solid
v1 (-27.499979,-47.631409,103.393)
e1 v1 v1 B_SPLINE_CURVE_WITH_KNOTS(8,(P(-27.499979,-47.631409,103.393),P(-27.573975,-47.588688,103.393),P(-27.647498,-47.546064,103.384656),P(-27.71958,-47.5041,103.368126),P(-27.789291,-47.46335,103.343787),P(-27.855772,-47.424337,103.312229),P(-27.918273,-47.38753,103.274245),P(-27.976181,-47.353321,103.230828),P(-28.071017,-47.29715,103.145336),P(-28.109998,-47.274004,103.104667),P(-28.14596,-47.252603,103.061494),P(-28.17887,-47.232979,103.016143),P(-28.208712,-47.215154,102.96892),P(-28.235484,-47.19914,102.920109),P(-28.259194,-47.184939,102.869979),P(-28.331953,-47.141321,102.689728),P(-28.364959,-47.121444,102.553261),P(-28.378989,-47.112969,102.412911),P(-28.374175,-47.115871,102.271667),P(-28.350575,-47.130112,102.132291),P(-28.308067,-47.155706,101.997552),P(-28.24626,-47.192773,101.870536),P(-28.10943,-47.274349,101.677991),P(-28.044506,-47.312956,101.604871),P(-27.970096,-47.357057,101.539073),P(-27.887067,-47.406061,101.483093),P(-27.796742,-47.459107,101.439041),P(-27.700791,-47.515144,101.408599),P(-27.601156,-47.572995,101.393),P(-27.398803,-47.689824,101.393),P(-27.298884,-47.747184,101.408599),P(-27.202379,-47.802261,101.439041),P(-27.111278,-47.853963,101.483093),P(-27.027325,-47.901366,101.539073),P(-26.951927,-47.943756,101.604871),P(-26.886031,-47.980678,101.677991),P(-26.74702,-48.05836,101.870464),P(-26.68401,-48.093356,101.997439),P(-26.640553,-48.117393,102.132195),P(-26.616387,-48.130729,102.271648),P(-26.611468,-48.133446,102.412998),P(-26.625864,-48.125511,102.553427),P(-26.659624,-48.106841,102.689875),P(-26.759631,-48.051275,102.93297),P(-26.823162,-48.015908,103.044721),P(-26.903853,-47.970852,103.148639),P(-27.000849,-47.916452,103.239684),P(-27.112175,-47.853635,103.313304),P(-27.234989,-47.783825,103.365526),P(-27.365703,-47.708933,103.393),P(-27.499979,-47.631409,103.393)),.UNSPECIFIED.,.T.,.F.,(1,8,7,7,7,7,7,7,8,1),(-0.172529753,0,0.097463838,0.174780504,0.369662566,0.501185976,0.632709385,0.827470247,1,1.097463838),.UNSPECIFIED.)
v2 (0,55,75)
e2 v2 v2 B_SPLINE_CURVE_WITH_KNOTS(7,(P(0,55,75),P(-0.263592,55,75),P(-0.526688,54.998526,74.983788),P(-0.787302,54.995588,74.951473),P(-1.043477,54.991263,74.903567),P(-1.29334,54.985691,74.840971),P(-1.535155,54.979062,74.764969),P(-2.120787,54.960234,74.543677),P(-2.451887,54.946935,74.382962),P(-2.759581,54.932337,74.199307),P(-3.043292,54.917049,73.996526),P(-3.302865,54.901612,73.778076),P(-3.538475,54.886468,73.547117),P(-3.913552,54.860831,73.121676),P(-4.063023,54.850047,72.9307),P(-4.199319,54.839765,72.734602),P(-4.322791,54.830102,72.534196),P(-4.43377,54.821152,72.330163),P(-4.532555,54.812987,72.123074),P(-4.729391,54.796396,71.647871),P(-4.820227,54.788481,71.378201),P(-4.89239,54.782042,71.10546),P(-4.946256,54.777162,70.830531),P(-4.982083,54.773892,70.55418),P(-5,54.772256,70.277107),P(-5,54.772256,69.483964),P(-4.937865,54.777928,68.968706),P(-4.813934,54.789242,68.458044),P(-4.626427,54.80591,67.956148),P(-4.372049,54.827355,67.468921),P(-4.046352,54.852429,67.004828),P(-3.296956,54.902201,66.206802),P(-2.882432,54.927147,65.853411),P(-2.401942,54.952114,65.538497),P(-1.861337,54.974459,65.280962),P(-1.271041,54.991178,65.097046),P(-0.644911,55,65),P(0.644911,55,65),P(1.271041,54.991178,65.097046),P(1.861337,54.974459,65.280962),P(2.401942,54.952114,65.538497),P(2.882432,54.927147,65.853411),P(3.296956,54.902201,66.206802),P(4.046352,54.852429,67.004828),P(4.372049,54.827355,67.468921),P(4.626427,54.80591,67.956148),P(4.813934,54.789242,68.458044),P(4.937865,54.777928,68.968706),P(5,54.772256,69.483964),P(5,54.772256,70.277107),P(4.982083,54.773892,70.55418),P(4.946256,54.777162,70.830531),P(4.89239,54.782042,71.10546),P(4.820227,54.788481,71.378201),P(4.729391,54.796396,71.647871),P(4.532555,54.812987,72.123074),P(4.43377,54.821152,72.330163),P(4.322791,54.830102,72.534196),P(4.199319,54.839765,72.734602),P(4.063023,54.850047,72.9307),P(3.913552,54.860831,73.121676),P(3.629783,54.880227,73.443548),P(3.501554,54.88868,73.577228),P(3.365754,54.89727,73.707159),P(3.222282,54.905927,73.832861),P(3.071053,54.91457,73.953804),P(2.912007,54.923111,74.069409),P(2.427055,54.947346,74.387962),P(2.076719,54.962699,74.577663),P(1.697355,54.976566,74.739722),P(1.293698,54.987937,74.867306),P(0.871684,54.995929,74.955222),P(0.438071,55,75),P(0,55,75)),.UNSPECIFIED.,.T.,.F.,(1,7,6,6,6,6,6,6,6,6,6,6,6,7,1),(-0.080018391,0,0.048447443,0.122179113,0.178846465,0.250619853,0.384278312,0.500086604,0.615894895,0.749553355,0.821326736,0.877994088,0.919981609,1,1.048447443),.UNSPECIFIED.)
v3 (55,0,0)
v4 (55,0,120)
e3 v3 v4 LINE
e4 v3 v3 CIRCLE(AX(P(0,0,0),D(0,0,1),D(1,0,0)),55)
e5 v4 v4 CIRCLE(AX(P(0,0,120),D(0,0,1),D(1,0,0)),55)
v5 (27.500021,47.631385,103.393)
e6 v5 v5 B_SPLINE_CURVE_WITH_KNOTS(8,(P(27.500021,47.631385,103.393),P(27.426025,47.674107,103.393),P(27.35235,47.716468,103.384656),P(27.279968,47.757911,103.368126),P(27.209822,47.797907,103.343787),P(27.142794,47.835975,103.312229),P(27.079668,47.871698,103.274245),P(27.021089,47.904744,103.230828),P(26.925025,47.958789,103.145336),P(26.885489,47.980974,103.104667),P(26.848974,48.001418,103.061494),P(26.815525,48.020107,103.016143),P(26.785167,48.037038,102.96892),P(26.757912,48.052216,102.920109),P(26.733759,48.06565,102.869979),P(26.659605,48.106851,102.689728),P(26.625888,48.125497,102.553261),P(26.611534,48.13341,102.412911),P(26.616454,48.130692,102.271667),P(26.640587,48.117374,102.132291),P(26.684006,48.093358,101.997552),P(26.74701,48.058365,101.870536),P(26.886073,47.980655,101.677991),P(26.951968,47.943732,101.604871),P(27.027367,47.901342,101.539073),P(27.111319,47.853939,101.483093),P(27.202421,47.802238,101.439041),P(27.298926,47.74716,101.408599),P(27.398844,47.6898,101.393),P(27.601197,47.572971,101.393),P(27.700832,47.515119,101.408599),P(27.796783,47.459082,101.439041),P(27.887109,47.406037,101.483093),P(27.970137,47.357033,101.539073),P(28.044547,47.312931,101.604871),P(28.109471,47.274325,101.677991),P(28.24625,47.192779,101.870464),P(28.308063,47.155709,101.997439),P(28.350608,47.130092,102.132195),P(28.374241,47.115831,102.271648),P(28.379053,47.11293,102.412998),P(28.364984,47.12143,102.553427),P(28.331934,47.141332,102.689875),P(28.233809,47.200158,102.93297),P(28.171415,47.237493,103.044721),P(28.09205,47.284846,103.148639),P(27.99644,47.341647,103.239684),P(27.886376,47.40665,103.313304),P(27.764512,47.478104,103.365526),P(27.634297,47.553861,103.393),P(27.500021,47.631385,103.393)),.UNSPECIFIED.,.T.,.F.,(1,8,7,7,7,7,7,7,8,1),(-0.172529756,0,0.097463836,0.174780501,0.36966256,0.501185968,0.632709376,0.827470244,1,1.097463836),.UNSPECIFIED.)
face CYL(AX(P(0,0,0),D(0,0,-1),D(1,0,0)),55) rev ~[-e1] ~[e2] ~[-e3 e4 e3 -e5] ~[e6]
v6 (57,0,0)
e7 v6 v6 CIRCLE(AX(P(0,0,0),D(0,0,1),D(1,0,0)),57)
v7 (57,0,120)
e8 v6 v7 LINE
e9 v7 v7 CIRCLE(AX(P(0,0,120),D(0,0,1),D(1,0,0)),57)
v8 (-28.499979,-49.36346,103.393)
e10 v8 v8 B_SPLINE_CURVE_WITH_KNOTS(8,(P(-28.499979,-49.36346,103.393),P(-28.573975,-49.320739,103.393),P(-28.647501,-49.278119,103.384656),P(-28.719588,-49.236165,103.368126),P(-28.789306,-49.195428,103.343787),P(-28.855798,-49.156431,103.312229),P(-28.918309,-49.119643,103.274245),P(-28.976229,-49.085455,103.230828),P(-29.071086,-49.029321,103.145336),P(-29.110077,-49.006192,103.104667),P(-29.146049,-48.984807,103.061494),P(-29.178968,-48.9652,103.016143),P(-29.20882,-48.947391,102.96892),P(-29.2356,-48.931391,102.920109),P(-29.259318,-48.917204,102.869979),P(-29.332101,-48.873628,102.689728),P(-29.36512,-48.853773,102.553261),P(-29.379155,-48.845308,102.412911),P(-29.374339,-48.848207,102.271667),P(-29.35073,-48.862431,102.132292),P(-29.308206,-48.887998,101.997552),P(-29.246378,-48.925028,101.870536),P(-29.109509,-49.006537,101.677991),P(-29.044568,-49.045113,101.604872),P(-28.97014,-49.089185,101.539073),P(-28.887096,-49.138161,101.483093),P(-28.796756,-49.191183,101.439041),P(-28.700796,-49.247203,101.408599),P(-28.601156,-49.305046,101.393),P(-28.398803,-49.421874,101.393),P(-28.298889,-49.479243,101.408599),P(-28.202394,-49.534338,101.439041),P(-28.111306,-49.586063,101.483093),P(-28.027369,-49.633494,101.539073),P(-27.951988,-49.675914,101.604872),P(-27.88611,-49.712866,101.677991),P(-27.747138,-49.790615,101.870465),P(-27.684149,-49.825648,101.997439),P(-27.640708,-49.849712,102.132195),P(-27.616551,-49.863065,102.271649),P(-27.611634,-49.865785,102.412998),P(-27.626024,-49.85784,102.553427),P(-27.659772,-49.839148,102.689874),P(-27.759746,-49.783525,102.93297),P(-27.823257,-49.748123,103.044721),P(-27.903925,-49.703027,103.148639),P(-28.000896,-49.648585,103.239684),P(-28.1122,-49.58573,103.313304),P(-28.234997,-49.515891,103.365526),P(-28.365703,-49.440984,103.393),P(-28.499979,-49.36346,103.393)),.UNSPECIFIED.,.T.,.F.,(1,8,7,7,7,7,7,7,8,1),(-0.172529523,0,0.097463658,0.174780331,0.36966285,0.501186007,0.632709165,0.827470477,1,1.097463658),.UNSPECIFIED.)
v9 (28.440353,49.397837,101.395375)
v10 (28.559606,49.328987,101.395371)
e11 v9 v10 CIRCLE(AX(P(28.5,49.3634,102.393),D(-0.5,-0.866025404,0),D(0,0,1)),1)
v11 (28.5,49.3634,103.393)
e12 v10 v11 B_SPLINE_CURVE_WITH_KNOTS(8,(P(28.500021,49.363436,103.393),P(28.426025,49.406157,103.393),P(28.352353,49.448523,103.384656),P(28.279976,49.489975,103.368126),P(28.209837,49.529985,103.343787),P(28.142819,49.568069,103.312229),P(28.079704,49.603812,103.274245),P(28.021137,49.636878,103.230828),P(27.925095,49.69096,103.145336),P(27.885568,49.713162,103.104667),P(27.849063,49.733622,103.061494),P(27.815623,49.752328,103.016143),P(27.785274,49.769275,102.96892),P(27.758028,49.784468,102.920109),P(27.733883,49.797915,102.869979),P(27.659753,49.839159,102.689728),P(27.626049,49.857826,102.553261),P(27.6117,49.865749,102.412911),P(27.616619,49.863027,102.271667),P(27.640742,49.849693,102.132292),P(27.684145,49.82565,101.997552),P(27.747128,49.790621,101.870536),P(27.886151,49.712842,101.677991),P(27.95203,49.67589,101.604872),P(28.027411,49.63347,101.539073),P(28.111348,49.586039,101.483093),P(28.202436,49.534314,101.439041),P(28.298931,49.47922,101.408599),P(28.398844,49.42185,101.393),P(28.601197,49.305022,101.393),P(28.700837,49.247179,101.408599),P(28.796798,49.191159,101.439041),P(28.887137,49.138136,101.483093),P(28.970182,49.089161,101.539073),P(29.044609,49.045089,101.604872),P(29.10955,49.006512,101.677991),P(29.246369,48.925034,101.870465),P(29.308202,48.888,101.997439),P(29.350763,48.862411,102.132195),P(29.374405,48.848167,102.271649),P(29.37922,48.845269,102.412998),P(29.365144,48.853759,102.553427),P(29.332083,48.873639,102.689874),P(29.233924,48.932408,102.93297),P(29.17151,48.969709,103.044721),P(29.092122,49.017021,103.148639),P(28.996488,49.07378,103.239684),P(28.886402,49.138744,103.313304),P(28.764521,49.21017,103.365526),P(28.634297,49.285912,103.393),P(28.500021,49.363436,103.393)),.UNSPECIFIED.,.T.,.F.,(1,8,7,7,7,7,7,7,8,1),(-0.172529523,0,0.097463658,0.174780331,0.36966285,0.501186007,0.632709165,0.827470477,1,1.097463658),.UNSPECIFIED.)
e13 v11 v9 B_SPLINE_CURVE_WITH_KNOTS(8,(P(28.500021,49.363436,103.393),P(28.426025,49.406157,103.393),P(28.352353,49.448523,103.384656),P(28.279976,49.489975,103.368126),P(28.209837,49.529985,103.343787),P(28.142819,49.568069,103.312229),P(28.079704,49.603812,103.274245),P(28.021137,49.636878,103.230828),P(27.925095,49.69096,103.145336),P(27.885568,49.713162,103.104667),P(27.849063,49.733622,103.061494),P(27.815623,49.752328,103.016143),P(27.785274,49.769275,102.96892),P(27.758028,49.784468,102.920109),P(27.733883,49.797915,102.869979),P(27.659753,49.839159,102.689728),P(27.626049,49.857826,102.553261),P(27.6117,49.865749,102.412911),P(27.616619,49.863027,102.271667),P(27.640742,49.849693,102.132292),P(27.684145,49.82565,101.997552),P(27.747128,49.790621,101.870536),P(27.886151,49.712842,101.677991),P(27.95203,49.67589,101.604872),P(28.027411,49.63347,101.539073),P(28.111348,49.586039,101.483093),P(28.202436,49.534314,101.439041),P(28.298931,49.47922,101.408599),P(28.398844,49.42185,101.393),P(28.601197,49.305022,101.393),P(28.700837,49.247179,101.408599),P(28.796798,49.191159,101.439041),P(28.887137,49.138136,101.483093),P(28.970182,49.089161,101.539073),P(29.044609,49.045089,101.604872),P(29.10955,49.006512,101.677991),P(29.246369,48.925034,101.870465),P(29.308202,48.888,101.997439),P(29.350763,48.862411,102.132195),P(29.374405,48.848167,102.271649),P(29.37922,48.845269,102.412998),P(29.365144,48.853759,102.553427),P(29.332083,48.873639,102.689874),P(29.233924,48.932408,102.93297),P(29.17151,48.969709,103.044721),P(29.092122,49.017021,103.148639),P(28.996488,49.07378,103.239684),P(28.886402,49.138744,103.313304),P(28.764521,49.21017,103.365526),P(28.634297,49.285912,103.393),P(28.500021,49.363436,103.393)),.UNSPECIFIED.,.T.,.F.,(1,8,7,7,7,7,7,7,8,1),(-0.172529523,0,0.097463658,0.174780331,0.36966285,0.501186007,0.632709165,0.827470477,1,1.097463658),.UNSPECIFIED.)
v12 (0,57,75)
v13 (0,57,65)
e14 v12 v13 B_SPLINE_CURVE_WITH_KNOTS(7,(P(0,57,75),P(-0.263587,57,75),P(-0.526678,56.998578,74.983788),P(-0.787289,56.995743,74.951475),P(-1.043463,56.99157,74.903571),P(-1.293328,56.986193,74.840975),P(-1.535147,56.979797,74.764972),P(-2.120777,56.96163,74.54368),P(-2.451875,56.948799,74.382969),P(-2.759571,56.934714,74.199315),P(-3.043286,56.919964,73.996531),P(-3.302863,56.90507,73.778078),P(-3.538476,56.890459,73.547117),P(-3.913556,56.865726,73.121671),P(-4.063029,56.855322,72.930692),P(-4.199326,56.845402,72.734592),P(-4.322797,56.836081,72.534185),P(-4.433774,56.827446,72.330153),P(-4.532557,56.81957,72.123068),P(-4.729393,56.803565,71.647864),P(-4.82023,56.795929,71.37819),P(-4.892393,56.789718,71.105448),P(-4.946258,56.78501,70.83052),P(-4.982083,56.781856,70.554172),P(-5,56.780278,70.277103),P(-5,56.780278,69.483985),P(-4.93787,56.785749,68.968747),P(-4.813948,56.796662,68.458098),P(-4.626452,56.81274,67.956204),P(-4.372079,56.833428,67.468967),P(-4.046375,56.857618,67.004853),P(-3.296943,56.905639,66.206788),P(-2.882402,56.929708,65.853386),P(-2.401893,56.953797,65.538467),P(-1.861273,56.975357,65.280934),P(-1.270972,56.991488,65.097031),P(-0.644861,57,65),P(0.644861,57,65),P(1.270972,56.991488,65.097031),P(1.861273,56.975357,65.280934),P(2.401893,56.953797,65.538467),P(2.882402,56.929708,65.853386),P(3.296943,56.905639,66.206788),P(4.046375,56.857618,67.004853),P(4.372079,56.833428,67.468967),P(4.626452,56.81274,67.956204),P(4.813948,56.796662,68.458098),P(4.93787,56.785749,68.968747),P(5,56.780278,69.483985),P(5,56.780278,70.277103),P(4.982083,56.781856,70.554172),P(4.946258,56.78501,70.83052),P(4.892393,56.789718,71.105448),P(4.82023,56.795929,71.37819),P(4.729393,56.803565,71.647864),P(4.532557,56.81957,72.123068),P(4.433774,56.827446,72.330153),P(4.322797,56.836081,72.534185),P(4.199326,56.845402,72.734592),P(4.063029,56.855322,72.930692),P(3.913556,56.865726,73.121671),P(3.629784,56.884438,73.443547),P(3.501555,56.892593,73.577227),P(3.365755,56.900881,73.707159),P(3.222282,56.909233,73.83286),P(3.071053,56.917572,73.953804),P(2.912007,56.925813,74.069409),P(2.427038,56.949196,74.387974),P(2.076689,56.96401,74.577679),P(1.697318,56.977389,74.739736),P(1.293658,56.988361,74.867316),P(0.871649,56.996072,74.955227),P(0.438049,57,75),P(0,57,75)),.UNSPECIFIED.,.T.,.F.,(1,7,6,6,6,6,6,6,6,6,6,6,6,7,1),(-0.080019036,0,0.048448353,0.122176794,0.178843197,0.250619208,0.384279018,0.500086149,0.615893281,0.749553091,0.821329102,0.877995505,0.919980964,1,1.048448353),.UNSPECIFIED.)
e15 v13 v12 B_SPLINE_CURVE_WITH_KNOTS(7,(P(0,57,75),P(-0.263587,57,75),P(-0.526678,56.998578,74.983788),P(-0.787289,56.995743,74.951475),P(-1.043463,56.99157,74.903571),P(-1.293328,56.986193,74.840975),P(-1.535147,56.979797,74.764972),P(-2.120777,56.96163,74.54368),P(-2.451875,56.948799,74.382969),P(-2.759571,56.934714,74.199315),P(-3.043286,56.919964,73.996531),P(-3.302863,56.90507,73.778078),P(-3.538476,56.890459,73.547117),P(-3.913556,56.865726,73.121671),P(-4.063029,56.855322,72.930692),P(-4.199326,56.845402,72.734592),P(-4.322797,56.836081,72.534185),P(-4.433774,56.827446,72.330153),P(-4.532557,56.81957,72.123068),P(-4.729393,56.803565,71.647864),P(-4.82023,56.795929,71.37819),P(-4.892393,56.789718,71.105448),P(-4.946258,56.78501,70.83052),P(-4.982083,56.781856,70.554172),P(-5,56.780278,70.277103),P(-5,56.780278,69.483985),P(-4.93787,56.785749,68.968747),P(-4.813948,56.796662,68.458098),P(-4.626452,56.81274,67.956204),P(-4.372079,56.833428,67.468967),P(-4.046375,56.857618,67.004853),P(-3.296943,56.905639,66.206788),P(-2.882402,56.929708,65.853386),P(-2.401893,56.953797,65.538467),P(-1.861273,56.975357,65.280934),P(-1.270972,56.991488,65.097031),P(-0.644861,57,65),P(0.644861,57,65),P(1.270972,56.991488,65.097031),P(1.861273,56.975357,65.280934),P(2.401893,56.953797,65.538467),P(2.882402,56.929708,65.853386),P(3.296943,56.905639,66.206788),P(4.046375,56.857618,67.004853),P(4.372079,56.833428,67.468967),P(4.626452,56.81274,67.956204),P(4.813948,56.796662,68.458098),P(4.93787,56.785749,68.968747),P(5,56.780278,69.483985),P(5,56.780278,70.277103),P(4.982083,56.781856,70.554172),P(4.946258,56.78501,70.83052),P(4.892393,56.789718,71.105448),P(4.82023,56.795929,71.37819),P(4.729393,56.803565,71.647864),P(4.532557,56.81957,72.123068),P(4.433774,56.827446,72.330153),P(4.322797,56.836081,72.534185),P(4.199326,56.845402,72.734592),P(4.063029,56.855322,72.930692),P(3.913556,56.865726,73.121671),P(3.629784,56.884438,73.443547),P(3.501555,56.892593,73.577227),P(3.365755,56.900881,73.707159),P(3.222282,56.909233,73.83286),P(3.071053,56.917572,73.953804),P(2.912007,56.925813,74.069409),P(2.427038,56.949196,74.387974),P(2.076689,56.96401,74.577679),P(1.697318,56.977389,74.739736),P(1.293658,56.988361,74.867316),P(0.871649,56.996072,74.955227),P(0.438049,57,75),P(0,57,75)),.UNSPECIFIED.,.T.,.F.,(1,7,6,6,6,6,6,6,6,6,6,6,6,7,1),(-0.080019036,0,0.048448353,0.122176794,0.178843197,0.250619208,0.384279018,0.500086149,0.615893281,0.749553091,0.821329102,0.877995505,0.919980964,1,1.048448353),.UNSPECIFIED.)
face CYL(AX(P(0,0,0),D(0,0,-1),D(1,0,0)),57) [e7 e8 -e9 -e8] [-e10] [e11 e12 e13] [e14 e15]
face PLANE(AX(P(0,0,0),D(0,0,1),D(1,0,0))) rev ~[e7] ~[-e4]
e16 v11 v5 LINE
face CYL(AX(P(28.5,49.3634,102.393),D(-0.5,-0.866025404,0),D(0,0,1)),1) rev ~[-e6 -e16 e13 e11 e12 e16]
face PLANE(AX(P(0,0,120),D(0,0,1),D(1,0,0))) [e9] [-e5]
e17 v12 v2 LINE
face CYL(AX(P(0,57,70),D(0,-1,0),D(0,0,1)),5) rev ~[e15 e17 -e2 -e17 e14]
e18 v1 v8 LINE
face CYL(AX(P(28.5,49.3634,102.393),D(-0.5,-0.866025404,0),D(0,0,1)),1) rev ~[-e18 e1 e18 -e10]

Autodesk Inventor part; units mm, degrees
ref_plane "YZ Plane" through (0, 0, 0) normal (1, 0, 0) x (0, 1, 0)
ref_plane "XZ Plane" through (0, 0, 0) normal (0, 1, 0) x (-1, 0, 0)
sketch "Sketch1" plane through (0, 0, 0) normal (0, 0, 1) x (1, 0, 0)
  circle A0 centre (0, 0) radius 57
  circle A1 centre (0, 0) radius 55
  dimension "d0" = 114
  dimension "d1" = 110
extrude "Extrusion1" add sketch "Sketch1" along normal blind 120
sketch "Sketch2" plane through (0, 0, 120) normal (0, 0, 1) x (1, 0, 0)
  circle A0 centre (0, 0) radius 57 projected
  point P0 (0, 57)
ref_plane "Work Plane1" through (0, 57, 120) normal (0, 1, 0) x (-1, 0, 0)
sketch "Sketch3" plane through (0, 57, 120) normal (0, 1, 0) x (-1, 0, 0)
  line L0 (57, 0) -> (-57, 0) projected
  point P0 (0, -120)
  point P1 (0, -50)
  dimension "d4" = 50
hole "Hole1" at (0, 57, 70) direction (0, -1, 0) diameter 10 depth 20 tip angle 118
sketch "Sketch6" plane through (0, 0, 120) normal (0, 0, 1) x (1, 0, 0)
  circle A0 centre (0, 0) radius 57 projected
  point P0 (0, 57)
sketch "Sketch11" plane through (0, 0, 120) normal (0, 0, 1) x (1, 0, 0)
  circle A0 centre (0, 0) radius 57 projected
  line L0 (28.5, 49.3634) -> (0, 0)
  line L1 (57, 0) -> (0, 0)
  dimension "d47" = 60
ref_plane "Work Plane7" through (28.5, 49.3634, 120) normal (0.5, 0.8660254, 0) x (-0.8660254, 0.5, 0)
sketch "Sketch12" plane through (28.5, 49.3634, 120) normal (0.5, 0.8660254, 0) x (-0.8660254, 0.5, 0)
  line L0 (57, 0) -> (-57, 0) projected
  point P0 (0, -120)
  point P1 (0, -17.607)
  dimension "d48" = 17.607
hole "Hole6" at (28.5, 49.3634, 102.393) direction (-0.5, -0.8660254, 0) diameter 2 end through all
equation "\"d54\" = Thickness"
equation "\"BendRadius\" = Thickness"
equation "\"BendReliefWidth\" = Thickness"
equation "\"BendReliefDepth\" = 0.5 * Thickness"
equation "\"CornerReliefSize\" = 4 * Thickness"
equation "\"MinimumRemnant\" = 2 * Thickness"
equation "\"TransitionRadius\" = BendRadius"
equation "\"JacobiRadiusSize\" = BendRadius"
equation "\"GapSize\" = Thickness"
equation "\"Thickness\" = 0.5"
properties part number "Electromagnetic cover body"
